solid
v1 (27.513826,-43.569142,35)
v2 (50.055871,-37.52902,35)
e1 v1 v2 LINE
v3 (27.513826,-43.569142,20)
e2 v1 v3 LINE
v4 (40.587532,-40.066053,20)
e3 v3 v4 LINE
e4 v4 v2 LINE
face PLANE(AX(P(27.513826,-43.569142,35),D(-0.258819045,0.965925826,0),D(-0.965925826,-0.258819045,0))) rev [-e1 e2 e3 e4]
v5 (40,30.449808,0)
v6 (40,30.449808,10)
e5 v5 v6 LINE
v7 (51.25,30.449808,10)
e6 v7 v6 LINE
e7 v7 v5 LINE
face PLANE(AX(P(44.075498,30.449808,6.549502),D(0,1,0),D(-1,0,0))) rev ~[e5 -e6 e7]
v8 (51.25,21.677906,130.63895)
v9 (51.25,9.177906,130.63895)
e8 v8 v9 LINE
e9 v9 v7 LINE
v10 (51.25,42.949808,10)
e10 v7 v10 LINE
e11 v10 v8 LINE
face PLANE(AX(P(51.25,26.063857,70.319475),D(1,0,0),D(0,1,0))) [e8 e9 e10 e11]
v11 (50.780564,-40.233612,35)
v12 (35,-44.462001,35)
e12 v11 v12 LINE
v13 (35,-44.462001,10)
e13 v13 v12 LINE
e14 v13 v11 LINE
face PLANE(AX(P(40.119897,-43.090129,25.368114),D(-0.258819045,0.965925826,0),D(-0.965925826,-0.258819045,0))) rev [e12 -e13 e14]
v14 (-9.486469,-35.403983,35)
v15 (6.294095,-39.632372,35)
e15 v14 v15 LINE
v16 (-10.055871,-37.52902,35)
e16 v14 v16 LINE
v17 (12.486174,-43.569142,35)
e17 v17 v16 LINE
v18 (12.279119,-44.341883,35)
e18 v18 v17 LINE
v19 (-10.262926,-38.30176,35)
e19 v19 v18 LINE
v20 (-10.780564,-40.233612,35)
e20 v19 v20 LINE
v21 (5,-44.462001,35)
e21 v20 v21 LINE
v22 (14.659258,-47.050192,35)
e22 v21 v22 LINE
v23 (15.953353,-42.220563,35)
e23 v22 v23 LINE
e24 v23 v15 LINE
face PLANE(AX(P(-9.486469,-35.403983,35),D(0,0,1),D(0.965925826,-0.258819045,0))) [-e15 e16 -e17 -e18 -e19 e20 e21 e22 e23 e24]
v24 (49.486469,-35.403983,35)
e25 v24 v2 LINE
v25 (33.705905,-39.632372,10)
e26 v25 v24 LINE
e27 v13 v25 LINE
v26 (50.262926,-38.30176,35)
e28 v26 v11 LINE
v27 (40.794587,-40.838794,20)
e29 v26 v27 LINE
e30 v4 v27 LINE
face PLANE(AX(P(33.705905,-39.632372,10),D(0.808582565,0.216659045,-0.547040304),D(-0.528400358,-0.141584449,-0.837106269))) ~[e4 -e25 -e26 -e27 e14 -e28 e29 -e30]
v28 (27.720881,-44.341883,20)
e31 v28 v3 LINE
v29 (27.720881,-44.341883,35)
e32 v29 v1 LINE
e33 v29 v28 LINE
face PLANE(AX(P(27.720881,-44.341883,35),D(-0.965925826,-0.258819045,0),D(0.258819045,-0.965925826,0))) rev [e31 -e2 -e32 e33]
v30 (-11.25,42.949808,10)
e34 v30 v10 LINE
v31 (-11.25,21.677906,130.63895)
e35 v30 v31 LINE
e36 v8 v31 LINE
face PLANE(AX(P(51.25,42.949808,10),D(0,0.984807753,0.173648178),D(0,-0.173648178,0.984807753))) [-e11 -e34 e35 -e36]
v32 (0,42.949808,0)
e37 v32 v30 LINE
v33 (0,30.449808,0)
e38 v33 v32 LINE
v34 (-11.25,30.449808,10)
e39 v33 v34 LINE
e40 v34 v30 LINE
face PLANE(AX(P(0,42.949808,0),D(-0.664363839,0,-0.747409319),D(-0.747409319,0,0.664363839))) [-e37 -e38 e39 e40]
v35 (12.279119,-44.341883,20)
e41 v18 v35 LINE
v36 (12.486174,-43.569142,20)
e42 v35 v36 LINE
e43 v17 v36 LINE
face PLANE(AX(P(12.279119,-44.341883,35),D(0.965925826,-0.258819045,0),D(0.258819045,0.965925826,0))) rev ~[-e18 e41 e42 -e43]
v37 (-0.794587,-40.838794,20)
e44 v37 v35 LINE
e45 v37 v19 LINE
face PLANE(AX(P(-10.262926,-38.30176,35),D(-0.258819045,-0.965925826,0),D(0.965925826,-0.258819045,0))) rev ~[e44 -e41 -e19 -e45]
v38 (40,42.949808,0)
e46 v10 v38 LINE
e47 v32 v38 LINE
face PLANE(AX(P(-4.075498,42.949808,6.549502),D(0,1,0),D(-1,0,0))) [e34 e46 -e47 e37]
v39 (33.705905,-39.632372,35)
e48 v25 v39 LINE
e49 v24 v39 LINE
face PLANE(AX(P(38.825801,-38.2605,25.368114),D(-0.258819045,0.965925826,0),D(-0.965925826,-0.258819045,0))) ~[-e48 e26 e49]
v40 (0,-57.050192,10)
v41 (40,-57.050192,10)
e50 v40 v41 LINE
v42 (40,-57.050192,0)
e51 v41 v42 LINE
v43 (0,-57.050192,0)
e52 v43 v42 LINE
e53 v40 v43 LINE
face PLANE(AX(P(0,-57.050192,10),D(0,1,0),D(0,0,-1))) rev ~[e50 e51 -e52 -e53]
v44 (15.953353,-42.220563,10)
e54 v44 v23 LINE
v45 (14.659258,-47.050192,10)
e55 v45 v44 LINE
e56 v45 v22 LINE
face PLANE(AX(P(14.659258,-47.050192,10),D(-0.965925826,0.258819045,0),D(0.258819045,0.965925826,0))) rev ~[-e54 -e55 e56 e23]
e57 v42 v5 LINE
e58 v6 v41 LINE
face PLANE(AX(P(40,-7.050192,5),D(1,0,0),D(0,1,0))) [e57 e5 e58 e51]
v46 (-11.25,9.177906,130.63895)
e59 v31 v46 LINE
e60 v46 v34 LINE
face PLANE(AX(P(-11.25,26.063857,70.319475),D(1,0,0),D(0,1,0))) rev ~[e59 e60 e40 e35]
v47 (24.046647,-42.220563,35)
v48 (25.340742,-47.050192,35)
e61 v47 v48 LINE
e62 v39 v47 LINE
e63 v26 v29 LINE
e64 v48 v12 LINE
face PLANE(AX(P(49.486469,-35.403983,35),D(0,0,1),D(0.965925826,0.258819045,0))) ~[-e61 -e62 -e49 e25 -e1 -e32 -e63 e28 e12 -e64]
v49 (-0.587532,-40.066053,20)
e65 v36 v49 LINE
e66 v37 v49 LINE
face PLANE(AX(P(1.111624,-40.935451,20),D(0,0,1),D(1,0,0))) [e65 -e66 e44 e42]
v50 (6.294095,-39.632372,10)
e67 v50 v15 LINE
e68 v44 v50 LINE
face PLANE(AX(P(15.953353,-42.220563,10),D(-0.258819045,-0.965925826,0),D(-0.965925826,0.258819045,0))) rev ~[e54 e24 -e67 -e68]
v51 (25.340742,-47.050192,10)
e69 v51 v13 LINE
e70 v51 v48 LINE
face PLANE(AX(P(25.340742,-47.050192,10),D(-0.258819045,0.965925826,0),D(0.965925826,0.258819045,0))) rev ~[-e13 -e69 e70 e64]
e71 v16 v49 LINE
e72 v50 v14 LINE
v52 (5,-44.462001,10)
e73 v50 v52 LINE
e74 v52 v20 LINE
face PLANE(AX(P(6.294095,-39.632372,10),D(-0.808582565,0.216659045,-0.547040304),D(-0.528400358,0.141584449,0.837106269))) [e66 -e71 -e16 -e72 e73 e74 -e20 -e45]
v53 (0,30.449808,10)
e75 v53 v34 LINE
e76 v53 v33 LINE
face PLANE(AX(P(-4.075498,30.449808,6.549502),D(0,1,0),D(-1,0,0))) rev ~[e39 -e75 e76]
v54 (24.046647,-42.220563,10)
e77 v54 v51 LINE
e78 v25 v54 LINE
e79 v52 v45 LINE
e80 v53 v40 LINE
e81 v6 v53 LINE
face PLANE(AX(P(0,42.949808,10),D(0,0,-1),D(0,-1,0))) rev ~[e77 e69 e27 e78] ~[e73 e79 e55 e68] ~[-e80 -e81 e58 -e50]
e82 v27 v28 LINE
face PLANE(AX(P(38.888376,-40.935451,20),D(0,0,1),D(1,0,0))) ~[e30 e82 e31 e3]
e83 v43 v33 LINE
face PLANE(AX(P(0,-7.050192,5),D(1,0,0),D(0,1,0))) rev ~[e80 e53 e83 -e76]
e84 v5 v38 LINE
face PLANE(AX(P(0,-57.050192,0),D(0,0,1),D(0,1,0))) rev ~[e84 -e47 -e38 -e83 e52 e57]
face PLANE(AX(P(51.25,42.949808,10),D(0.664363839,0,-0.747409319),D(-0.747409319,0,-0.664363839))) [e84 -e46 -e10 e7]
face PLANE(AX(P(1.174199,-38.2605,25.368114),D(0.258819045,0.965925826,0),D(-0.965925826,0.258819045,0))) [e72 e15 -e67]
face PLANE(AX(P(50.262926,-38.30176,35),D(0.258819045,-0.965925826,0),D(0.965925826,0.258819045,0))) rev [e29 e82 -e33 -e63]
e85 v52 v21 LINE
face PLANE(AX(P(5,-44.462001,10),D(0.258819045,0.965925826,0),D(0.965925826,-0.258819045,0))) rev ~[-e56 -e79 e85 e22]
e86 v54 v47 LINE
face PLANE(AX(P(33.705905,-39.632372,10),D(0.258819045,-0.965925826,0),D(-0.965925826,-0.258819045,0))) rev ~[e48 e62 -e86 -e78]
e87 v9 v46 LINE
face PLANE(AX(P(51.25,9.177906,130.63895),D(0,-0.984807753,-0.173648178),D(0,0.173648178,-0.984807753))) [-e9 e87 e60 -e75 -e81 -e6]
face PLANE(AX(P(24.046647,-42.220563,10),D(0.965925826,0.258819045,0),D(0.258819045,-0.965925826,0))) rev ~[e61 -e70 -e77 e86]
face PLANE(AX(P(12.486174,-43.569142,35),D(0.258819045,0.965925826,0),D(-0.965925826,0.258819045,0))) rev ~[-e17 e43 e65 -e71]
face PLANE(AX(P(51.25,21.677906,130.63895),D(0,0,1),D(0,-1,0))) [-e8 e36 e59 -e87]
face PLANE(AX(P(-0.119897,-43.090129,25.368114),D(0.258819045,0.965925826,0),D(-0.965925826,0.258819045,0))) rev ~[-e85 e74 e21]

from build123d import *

# Parameters (mm, degrees)
F1_DEPTH  = 40
F4_DEPTH  = 62.5
F6_DEPTH  = 12.5
F8_DEPTH  = 25
F10_DEPTH = 5
F12_DEPTH = 15


# Not quite as in the source:
# - a pattern or mirror of a feature is missing from the dataset's text; its kind, count and spacing are read off the source's solid


with BuildPart() as f1:
    # F0 (on Right) → F1 (new body)
    with BuildSketch(Plane.YZ):
        Polygon((-57.0501919146, 0), (0, 0), (42.9498080854, 0), (42.9498080854, 10), (-57.0501919146, 10), align=None)
    extrude(amount=F1_DEPTH)

    # F3 (on offset) → F4 (join)
    with BuildSketch(Plane.YZ.offset(51.25)):
        Polygon((9.1779063212, 130.638949744), (30.4498080854, 10), (42.9498080854, 10), (21.6779063212, 130.638949744), align=None)
    extrude(amount=-F4_DEPTH)

    # F5 (on face) → F6 (join)
    with BuildSketch(Plane(origin=(0, 42.9498080854, 0), x_dir=(-1, 0, 0), z_dir=(0, 1, 0))):
        Polygon((11.25, 10), (0, 10), (0, 0), align=None)
        Polygon((-40, 0), (-40, 10), (-51.25, 10), align=None)
    extrude(amount=-F6_DEPTH)

    # F7 (on face) → F8 (join)
    with BuildSketch(Plane.XY.offset(10)):
        Polygon((15.9533534884, -42.2205627832), (6.2940952255, -39.6323723322), (5, -44.4620014636), (14.6592582629, -47.0501919146), align=None)
        Polygon((33.7059047745, -39.6323723322), (24.0466465116, -42.2205627832), (25.3407417371, -47.0501919146), (35, -44.4620014636), align=None)
    extrude(amount=F8_DEPTH)

    # F9 (on face) → F10 (join)
    with BuildSketch(Plane(origin=(-9.4864686499, -35.4039829857, 0), x_dir=(-0.9659258263, 0.2588190451, 0), z_dir=(0.2588190451, 0.9659258263, 0))):
        Polygon((-16.3372418936, 35), (-16.3372418936, 10), (0, 35), align=None)
    f10 = extrude(amount=-F10_DEPTH)

    # F10_copies: F10 across plane
    add(f10.mirror(Plane(origin=(20, 0, 0), x_dir=(0, 0, 1), z_dir=(1, 0, 0))))

    # F11 (on face) → F12 (cut)
    with BuildSketch(Plane.XY.offset(35)):
        Polygon((12.2791188742, -44.3418831268), (12.4861741103, -43.5691424657), (-10.0558705491, -37.5290198035), (-10.2629257852, -38.3017604645), align=None)
    f12 = extrude(amount=-F12_DEPTH, mode=Mode.SUBTRACT)

    # F12_copies: F12 across plane
    add(f12.mirror(Plane(origin=(20, 0, 0), x_dir=(0, 0, 1), z_dir=(1, 0, 0))), mode=Mode.SUBTRACT)


solid = f1.part
